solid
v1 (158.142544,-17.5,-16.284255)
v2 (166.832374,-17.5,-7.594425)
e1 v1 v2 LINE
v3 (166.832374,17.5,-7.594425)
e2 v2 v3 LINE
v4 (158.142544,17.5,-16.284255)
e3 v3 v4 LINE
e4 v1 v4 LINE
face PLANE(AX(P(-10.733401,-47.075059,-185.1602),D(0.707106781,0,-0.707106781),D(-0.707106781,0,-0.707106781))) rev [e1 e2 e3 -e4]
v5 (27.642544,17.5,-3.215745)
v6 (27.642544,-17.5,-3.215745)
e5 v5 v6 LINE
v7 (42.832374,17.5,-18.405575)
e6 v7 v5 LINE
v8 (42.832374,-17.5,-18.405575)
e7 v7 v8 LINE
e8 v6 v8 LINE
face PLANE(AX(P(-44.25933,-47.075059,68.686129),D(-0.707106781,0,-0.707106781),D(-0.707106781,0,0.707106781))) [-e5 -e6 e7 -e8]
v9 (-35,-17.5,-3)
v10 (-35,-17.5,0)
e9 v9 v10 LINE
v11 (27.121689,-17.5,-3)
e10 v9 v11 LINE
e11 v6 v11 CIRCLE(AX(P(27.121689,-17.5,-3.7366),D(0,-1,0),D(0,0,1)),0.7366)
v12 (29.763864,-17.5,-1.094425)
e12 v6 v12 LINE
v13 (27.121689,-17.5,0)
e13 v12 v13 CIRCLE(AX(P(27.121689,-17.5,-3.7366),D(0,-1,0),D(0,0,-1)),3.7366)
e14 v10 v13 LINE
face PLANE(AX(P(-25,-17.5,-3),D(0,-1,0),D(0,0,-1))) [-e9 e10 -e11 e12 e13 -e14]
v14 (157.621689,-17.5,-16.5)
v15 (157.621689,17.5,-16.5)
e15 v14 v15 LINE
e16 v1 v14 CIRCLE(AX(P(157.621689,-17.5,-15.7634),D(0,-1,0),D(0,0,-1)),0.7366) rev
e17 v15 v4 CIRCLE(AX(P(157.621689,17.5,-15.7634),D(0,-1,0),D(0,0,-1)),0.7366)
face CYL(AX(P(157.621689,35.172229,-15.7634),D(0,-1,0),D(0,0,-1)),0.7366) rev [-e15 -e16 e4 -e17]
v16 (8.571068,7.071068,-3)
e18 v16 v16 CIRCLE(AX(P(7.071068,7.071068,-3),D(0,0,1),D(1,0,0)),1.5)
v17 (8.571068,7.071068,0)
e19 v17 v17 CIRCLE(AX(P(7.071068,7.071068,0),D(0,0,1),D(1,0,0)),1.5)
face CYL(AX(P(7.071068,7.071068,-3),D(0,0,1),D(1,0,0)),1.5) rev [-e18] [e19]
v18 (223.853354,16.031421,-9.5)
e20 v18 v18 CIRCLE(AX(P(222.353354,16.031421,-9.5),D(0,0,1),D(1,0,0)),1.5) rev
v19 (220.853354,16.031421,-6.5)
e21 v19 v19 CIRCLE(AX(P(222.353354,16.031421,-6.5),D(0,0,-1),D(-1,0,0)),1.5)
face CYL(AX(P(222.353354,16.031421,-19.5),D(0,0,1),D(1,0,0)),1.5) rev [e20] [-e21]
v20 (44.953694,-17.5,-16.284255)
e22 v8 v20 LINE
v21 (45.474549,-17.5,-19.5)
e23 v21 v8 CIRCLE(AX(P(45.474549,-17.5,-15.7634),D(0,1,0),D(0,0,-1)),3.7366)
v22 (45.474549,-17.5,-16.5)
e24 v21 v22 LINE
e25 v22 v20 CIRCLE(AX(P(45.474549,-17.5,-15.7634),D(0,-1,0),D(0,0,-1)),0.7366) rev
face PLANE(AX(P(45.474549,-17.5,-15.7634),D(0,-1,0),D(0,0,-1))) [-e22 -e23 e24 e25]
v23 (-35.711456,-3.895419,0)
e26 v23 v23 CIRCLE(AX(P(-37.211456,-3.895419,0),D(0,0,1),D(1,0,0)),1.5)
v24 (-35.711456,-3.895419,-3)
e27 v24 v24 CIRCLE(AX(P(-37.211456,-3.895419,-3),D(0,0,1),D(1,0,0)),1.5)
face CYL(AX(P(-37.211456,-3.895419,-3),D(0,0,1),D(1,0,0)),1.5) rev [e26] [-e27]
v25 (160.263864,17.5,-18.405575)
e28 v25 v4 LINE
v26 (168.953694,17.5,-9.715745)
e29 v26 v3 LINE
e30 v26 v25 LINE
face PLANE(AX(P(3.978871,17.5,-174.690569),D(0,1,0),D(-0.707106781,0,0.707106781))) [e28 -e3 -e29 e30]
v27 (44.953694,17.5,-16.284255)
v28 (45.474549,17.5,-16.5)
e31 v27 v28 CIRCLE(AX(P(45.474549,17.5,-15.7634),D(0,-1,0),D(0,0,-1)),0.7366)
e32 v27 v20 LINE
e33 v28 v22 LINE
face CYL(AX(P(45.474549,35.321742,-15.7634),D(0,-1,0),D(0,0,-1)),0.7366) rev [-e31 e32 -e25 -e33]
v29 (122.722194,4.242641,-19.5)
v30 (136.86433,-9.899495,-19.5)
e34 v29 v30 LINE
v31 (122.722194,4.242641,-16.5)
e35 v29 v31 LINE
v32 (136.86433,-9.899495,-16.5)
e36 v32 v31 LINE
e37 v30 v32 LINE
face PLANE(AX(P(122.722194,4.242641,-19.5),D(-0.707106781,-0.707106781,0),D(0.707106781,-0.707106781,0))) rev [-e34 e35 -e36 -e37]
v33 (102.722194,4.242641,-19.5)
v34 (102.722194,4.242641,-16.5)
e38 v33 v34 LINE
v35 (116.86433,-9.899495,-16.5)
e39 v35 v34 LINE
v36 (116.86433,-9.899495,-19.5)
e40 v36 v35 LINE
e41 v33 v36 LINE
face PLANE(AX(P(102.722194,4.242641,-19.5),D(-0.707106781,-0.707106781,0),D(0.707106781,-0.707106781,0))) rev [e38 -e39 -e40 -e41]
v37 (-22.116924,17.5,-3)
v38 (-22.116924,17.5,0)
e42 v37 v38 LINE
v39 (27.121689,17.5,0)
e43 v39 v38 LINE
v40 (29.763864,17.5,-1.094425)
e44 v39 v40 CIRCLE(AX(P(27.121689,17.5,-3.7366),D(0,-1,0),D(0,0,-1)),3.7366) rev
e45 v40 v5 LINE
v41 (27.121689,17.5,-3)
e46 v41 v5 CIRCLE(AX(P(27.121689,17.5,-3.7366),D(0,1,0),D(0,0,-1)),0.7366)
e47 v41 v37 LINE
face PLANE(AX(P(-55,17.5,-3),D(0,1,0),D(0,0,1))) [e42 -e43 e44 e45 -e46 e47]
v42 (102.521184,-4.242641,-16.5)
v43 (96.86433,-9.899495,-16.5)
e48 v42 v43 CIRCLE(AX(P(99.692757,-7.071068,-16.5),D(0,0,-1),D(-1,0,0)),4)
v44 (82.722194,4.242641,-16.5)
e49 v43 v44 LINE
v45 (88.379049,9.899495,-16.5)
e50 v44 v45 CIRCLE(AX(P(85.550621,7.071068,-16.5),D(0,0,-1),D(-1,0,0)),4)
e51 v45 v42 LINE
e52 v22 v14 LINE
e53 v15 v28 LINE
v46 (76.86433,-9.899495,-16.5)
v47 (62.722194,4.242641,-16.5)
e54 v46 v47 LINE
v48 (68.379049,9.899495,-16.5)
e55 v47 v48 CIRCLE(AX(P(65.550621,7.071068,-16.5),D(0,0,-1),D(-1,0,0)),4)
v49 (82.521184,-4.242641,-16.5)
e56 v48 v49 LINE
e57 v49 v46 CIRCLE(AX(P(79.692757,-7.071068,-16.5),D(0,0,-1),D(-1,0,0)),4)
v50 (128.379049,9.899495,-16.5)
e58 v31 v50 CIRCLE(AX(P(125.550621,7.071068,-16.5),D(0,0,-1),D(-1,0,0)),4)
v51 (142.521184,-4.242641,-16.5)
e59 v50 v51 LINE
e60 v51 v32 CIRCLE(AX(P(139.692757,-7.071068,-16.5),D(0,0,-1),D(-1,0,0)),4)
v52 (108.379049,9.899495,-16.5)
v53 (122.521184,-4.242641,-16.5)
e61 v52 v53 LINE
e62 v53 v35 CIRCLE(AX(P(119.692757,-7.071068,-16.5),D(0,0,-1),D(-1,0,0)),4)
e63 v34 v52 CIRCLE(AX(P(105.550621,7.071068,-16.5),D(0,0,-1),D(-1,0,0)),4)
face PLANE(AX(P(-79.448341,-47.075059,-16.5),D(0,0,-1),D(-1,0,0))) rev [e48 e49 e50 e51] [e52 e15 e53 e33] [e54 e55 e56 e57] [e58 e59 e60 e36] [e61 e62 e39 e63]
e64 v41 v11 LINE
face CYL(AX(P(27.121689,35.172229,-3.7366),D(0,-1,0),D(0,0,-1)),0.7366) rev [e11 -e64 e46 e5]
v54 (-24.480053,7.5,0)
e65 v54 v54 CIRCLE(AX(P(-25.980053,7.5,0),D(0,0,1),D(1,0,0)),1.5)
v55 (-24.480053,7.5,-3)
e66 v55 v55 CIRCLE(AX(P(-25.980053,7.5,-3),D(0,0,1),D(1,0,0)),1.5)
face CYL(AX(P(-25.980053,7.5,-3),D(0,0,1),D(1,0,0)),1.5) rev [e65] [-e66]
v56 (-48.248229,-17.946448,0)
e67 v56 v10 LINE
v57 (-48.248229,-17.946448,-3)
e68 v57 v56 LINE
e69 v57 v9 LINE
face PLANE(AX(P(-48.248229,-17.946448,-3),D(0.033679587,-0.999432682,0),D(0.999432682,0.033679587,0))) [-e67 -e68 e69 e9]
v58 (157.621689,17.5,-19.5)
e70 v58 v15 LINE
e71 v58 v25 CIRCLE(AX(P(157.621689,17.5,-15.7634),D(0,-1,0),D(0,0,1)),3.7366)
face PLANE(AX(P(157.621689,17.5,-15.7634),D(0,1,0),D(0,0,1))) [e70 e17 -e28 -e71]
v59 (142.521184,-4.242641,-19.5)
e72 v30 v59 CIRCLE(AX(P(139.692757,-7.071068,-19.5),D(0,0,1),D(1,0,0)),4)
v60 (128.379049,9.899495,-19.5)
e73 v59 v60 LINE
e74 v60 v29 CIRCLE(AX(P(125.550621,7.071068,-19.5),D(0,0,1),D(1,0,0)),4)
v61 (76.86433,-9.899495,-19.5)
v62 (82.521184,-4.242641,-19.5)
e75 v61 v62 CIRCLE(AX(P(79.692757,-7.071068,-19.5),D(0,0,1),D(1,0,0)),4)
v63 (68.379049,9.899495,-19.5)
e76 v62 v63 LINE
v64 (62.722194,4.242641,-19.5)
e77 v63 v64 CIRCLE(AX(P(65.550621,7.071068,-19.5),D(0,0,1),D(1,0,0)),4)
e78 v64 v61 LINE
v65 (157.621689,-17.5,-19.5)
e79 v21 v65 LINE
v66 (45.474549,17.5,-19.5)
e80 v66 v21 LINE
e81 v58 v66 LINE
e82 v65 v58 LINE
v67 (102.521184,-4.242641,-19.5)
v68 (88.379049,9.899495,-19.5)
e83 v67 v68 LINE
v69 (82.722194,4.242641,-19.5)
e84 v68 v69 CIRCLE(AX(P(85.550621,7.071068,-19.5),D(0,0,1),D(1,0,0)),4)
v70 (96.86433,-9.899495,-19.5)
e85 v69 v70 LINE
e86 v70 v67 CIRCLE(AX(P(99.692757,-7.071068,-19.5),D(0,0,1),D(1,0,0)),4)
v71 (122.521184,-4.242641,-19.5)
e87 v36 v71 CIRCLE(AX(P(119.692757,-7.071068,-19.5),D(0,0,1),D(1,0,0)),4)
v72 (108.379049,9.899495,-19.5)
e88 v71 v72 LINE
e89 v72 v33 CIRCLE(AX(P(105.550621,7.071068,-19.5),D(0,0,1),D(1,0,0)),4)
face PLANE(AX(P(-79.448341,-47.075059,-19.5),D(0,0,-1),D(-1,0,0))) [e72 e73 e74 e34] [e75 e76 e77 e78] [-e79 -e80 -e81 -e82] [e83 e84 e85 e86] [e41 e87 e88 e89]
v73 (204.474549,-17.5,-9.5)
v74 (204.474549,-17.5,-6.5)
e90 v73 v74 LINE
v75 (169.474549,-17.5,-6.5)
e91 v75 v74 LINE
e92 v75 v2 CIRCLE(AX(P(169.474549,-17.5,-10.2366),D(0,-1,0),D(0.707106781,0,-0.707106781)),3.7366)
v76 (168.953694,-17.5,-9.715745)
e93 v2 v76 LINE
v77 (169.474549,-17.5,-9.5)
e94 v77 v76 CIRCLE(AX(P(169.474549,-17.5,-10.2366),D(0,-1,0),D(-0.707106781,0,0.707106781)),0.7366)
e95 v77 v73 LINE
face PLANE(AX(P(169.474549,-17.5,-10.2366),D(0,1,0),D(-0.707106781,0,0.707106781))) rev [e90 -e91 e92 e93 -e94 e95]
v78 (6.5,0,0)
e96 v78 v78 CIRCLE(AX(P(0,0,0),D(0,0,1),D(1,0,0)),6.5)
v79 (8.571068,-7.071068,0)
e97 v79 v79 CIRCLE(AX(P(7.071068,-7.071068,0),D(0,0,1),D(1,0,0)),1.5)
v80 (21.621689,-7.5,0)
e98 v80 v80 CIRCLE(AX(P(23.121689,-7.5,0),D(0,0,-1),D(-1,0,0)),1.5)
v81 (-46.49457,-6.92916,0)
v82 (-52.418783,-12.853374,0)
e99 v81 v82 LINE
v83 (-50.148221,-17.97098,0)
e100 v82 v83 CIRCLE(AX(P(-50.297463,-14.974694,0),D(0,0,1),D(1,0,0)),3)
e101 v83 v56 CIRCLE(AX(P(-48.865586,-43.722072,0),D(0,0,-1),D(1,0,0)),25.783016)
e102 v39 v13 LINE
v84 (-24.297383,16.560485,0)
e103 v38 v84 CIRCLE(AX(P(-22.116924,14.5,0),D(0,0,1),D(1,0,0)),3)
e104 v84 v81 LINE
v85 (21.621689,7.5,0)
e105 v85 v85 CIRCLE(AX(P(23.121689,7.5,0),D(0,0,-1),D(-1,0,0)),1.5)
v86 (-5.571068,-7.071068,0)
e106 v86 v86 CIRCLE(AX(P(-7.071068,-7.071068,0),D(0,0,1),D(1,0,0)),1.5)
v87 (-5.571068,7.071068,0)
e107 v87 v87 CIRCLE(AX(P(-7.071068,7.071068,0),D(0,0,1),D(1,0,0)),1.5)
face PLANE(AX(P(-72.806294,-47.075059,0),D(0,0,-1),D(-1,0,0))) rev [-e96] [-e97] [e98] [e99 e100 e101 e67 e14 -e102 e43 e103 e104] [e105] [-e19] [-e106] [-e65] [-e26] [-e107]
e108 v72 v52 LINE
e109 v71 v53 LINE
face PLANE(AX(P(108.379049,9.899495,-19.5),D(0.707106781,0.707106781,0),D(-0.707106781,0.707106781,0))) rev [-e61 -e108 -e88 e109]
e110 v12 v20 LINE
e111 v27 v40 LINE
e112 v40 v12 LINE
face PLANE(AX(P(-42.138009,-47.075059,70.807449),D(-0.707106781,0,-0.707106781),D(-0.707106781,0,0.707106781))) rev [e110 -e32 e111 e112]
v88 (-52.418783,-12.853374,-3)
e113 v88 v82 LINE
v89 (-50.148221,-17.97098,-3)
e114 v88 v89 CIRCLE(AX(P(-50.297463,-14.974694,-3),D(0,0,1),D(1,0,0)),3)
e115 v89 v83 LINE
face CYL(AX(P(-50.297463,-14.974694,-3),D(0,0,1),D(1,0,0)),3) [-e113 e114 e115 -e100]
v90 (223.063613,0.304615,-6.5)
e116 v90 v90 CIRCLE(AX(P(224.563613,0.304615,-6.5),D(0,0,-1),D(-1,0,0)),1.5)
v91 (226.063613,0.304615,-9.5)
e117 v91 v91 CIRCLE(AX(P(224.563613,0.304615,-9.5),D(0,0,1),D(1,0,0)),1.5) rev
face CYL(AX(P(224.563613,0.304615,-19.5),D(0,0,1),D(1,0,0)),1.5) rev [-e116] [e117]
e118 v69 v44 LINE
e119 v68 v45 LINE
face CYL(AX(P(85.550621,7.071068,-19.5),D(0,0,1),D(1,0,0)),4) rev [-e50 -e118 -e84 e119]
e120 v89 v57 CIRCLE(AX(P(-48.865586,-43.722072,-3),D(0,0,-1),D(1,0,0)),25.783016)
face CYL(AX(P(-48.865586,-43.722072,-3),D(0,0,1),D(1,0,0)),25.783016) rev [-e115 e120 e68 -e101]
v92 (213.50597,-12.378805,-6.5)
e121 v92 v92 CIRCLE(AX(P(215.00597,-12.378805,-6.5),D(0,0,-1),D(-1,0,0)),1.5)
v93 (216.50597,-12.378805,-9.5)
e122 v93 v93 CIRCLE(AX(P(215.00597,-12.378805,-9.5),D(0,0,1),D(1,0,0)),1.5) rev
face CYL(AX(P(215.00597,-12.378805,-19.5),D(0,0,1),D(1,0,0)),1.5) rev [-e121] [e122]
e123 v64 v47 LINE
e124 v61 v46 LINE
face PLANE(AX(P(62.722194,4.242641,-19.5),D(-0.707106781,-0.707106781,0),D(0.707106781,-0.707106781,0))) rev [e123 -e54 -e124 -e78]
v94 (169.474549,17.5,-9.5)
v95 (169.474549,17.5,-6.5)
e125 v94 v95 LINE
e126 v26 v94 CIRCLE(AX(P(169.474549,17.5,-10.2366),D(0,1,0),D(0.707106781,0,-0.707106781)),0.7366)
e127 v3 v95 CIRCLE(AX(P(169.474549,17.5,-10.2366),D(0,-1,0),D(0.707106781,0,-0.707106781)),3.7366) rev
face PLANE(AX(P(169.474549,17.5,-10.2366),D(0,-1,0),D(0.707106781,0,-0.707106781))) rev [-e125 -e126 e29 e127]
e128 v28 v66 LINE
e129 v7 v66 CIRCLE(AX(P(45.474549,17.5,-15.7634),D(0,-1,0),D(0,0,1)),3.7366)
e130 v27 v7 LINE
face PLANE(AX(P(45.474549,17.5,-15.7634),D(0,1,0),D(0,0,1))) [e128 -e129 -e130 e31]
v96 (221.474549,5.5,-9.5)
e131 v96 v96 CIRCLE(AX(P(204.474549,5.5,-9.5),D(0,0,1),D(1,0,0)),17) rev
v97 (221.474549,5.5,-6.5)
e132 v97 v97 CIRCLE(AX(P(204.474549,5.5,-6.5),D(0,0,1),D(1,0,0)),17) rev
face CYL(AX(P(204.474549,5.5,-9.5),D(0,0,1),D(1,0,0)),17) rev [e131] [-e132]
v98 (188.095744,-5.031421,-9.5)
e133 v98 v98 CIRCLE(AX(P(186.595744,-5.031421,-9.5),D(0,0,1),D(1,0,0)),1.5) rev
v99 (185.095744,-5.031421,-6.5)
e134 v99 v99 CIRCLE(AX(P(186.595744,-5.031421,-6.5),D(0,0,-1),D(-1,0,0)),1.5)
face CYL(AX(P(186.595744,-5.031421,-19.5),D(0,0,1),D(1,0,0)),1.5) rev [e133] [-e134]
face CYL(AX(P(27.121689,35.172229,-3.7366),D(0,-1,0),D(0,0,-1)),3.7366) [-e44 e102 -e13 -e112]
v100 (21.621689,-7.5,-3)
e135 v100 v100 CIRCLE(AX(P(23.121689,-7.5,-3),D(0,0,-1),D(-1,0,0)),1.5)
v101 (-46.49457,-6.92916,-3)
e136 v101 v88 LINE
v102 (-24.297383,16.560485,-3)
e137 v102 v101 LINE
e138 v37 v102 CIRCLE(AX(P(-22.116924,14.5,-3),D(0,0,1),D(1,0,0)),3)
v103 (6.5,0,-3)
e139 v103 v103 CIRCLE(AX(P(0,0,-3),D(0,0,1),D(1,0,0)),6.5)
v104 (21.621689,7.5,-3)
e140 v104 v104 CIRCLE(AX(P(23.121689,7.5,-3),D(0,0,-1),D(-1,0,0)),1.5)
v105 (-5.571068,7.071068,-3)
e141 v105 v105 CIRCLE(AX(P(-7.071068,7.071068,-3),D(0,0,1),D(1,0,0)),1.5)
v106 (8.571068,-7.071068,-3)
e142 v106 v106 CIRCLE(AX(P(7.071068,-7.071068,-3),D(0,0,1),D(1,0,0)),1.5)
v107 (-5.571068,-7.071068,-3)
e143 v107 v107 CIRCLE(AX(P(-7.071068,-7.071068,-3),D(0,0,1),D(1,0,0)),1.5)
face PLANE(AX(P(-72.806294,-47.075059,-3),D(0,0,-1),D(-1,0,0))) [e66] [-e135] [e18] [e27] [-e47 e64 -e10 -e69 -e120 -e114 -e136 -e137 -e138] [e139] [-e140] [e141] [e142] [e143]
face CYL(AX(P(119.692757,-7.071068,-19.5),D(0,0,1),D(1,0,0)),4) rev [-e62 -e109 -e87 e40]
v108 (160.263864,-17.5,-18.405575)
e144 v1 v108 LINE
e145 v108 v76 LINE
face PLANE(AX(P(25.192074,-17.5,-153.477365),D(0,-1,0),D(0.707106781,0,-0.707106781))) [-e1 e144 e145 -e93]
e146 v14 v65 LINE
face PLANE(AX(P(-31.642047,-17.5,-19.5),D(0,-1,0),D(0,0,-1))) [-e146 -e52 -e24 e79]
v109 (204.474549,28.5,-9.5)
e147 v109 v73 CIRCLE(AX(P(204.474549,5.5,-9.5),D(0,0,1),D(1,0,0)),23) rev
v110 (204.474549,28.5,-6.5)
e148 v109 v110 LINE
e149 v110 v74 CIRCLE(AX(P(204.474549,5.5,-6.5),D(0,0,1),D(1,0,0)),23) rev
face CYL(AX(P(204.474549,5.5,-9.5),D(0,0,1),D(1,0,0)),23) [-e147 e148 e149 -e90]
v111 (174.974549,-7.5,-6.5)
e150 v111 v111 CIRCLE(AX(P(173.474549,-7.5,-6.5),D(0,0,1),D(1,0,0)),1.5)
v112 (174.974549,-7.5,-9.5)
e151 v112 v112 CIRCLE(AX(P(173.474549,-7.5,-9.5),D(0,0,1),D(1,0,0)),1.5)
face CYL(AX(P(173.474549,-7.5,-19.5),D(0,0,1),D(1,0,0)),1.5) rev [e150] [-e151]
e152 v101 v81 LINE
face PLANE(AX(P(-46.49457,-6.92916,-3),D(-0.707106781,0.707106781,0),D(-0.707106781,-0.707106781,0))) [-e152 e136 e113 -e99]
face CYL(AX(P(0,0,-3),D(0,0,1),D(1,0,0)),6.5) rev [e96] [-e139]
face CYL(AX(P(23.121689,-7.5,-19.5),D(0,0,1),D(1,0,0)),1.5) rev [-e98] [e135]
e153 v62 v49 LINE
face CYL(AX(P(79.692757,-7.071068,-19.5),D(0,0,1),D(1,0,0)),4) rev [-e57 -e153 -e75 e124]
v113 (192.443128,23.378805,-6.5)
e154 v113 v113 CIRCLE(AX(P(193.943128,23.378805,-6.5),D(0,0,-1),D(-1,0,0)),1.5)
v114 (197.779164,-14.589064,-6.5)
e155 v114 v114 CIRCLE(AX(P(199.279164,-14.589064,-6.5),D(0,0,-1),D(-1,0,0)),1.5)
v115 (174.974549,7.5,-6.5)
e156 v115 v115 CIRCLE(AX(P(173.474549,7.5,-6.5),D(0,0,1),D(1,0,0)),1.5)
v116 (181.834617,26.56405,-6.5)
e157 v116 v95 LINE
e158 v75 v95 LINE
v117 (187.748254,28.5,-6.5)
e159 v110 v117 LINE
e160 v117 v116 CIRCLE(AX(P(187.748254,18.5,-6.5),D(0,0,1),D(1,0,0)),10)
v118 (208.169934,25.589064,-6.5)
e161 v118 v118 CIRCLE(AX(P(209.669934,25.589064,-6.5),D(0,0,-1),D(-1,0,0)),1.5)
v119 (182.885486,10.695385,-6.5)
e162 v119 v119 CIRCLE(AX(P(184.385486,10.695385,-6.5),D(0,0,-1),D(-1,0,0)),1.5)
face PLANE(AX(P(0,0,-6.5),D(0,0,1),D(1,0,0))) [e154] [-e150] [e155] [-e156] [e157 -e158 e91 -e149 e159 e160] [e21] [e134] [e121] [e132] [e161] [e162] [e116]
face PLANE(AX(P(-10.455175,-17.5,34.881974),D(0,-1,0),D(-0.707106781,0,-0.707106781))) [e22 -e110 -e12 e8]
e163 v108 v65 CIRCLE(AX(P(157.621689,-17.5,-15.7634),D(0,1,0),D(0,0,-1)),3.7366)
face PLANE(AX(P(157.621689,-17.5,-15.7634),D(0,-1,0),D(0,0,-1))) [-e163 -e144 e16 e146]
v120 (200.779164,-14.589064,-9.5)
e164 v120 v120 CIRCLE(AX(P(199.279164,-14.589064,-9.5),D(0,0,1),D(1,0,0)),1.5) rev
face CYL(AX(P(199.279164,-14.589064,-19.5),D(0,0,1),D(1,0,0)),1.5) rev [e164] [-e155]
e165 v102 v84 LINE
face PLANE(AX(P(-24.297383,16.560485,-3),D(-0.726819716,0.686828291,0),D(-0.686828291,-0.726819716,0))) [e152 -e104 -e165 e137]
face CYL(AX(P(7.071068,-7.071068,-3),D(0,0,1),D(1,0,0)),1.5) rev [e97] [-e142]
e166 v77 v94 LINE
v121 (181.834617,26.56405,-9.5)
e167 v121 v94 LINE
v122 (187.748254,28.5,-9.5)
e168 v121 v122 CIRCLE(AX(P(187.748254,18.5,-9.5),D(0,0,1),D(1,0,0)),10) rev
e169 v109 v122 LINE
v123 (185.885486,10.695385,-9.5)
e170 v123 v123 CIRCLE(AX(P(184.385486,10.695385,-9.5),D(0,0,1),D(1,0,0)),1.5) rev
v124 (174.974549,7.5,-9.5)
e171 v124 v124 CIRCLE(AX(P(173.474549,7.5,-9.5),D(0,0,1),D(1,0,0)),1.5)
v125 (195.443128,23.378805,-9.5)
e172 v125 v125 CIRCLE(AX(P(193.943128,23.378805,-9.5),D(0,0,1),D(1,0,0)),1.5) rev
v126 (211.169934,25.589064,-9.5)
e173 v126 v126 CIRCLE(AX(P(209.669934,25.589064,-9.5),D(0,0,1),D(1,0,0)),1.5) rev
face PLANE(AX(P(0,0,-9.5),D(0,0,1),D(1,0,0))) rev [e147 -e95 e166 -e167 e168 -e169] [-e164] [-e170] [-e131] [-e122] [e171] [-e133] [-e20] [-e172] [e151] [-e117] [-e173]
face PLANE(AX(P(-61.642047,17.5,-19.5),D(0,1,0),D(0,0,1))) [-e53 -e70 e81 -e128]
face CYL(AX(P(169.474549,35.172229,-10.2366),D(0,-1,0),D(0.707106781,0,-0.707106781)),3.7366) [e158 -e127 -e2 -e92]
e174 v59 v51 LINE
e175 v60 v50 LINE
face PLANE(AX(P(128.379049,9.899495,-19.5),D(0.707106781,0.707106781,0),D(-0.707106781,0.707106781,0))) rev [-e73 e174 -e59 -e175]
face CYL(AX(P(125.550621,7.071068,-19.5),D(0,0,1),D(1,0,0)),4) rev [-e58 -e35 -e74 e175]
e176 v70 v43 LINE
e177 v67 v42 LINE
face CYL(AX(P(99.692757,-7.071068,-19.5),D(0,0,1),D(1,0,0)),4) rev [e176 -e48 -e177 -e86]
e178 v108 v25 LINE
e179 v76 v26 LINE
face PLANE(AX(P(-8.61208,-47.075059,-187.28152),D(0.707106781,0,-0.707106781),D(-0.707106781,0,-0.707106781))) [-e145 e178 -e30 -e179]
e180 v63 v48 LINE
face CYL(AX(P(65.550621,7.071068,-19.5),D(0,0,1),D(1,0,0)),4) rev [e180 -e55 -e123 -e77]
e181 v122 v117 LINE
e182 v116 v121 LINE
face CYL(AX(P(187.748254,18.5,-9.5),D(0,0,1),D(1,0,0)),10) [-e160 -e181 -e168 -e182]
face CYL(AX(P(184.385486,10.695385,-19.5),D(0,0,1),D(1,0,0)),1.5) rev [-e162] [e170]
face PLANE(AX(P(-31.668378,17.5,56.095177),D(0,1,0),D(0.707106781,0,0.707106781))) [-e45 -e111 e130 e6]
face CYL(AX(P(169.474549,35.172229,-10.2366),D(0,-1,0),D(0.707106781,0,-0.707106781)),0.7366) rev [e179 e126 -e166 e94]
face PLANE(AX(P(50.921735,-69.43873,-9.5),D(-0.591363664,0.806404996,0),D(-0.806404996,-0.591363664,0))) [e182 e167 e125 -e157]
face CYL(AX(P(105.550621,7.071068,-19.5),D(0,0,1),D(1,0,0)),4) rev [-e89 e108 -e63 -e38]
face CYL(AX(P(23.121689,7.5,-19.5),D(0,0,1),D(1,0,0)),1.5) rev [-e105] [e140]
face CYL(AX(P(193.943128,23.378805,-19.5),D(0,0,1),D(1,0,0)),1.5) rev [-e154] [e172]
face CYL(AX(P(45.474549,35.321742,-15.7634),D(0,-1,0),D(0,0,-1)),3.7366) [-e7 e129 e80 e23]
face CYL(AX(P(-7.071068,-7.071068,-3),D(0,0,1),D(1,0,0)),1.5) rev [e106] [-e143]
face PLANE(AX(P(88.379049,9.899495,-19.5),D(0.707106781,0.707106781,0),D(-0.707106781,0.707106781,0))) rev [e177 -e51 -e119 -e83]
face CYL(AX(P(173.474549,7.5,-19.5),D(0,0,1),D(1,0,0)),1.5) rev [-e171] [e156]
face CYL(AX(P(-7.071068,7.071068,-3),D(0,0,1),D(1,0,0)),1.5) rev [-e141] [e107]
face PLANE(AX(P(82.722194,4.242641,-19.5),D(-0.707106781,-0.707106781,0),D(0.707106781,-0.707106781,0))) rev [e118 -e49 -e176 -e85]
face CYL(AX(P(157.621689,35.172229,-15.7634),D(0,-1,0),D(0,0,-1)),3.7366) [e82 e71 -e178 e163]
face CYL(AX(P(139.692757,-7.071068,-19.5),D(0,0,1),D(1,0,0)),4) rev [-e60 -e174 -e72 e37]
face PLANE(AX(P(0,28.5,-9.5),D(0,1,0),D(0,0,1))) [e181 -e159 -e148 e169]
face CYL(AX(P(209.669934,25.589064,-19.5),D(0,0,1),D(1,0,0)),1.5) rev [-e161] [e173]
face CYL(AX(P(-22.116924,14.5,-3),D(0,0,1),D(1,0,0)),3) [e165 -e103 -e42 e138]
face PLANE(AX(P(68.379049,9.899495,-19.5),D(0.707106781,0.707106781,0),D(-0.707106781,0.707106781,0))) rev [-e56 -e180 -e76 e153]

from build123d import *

# Parameters (mm, degrees)
SKETCH_1_R               = 6.5
SKETCH_1_R_2             = 1.5
SM_BASE_FLANGE_1_DEPTH   = 3
OTHER_START              = -17.5
OTHER_1_DEPTH            = 35
OTHER_1_2_DEPTH          = 35
FILLET_1_R               = 5
EXTRUDE_START            = -3
EXTRUDE_1_OUTLINE_W      = 142
EXTRUDE_1_OUTLINE_H      = 35
EXTRUDE_1_DEPTH          = 3
OTHER_2_DEPTH            = 35
OTHER_2_2_DEPTH          = 35
SKETCH_9_W               = 40.525450659
SKETCH_9_H               = 35
CUT_EXTRUDE_1_DEPTH      = 212.62821173
EXTRUDE_START_2          = -6.5
SKETCH_10_R              = 23
SKETCH_10_R_2            = 20.75
SKETCH_10_R_3            = 17
EXTRUDE_2_DEPTH          = 3
FILLET_2_R               = 10
SKETCH_15_R              = 1.5
CUT_EXTRUDE_2_DEPTH      = 230.621254674
CUT_EXTRUDE_4_DEPTH      = 3
CUT_EXTRUDE_6_DEPTH      = 231.080791458
CUT_EXTRUDE_6_DEPTH_BACK = 231.080791458
SKETCH_21_R              = 1.5
CUT_EXTRUDE_7_DEPTH      = 230.845971463
CUT_EXTRUDE_7_DEPTH_BACK = 230.845971463
SKETCH_24_R              = 1.5
SKETCH_24_R_2            = 6.5
EXTRUDE_3_DEPTH          = 3


# Read off the part's stored shape, not the designer's step: 转折1, 凸台-拉伸1, 转折2
# Sheet-metal steps are written as plain solids
with BuildPart() as part:
    # Sketch 1 → 基体-法兰1 (new body)
    with BuildSketch(Plane.XY):
        with BuildLine():
            Line((-55, -2.5), (-55, 17.5))
            Line((-55, 17.5), (-25, 17.5))
            Line((-25, 17.5), (25, 17.5))
            Line((25, 17.5), (68, 17.5))
            Line((68, 17.5), (68, -17.5))
            Line((68, -17.5), (25, -17.5))
            Line((25, -17.5), (-25, -17.5))
            Line((-25, -17.5), (-35, -17.5))
            ThreePointArc((-35, -17.5), (-44.006294251, -8.675059002), (-55, -2.5))
        make_face()
        Circle(SKETCH_1_R, mode=Mode.SUBTRACT)
        with Locations((7.071067812, 7.071067812)):
            Circle(SKETCH_1_R_2, mode=Mode.SUBTRACT)
        with Locations((7.071067812, -7.071067812)):
            Circle(SKETCH_1_R_2, mode=Mode.SUBTRACT)
        with Locations((-7.071067812, -7.071067812)):
            Circle(SKETCH_1_R_2, mode=Mode.SUBTRACT)
        with Locations((-7.071067812, 7.071067812)):
            Circle(SKETCH_1_R_2, mode=Mode.SUBTRACT)
    extrude(amount=-SM_BASE_FLANGE_1_DEPTH)

    # Other 1 outline → Other 1 (cut)
    with BuildSketch(Plane(origin=(0, 0, 0), x_dir=(1, 0, 0), z_dir=(0, 1, 0)).offset(OTHER_START)):
        with BuildLine():
            Line((68, 3), (31.669439631, 3))
            Line((31.669439631, 3), (29.763864432, 1.094424801))
            ThreePointArc((29.763864432, 1.094424801), (28.551624147, 0.284431739), (27.121689234, 0))
            Line((27.121689234, 0), (68, 0))
            Line((68, 0), (68, 3))
        make_face()
    extrude(amount=OTHER_1_DEPTH, mode=Mode.SUBTRACT)

    # Other 1 2 outline → Other 1 2 (add)
    with BuildSketch(Plane(origin=(0, 0, 0), x_dir=(1, 0, 0), z_dir=(0, 1, 0)).offset(OTHER_START)):
        with BuildLine():
            ThreePointArc((45.474549341, 19.5), (44.044614428, 19.215568261), (42.832374142, 18.405575199))
            Line((42.832374142, 18.405575199), (27.642544089, 3.215745145))
            ThreePointArc((27.642544089, 3.215745145), (27.40357385, 3.056070336), (27.121689234, 3))
            Line((27.121689234, 3), (31.669439631, 3))
            Line((31.669439631, 3), (44.953694486, 16.284254855))
            ThreePointArc((44.953694486, 16.284254855), (45.192664725, 16.443929664), (45.474549341, 16.5))
            Line((45.474549341, 16.5), (68, 16.5))
            Line((68, 16.5), (68, 19.5))
            Line((68, 19.5), (45.474549341, 19.5))
        make_face()
    extrude(amount=OTHER_1_2_DEPTH)

    # 圆角1
    fillet_1_edges = [part.edges().sort_by_distance(p)[0] for p in [
        (-55, -2.5, -1.5),
        (-35, -17.5, -1.5),
        (-55, 17.5, -1.5),
    ]]
    fillet(fillet_1_edges, radius=FILLET_1_R)

    # 凸台-拉伸1 outline → 凸台-拉伸1 (add)
    with BuildSketch(Plane.XY.offset(-16.5).offset(EXTRUDE_START)):
        with Locations((139, 0)):
            Rectangle(EXTRUDE_1_OUTLINE_W, EXTRUDE_1_OUTLINE_H)
    extrude(amount=EXTRUDE_1_DEPTH)

    # Other 2 outline → Other 2 (cut)
    with BuildSketch(Plane(origin=(0, 0, 0), x_dir=(1, 0, 0), z_dir=(0, 1, 0)).offset(OTHER_START)):
        with BuildLine():
            Line((210, 19.5), (157.621689234, 19.5))
            ThreePointArc((157.621689234, 19.5), (159.051624147, 19.215568261), (160.263864432, 18.405575199))
            Line((160.263864432, 18.405575199), (162.169439631, 16.5))
            Line((162.169439631, 16.5), (210, 16.5))
            Line((210, 16.5), (210, 19.5))
        make_face()
    extrude(amount=OTHER_2_DEPTH, mode=Mode.SUBTRACT)

    # Other 2 2 outline → Other 2 2 (add)
    with BuildSketch(Plane(origin=(0, 0, 0), x_dir=(1, 0, 0), z_dir=(0, 1, 0)).offset(OTHER_START)):
        with BuildLine():
            Line((168.953694486, 9.715745145), (162.169439631, 16.5))
            Line((162.169439631, 16.5), (157.621689234, 16.5))
            ThreePointArc((157.621689234, 16.5), (157.90357385, 16.443929664), (158.142544089, 16.284254855))
            Line((158.142544089, 16.284254855), (166.832374142, 7.594424801))
            ThreePointArc((166.832374142, 7.594424801), (168.044614428, 6.784431739), (169.474549341, 6.5))
            Line((169.474549341, 6.5), (210, 6.5))
            Line((210, 6.5), (210, 9.5))
            Line((210, 9.5), (169.474549341, 9.5))
            ThreePointArc((169.474549341, 9.5), (169.192664725, 9.556070336), (168.953694486, 9.715745145))
        make_face()
    extrude(amount=OTHER_2_2_DEPTH)

    # 草图9 → 切除-拉伸1 (cut, through all)
    with BuildSketch(Plane.XY):
        with Locations((189.73727467, 0)):
            Rectangle(SKETCH_9_W, SKETCH_9_H)
    extrude(amount=-CUT_EXTRUDE_1_DEPTH, mode=Mode.SUBTRACT)

    # 草图10 → 凸台-拉伸2 (add)
    # profile 1 of 4: a face of its own
    with BuildSketch(Plane.XY.offset(EXTRUDE_START_2)):
        with BuildLine():
            ThreePointArc((157.474549341, 5.5), (118.211093374, 21.763455967), (134.474549341, -17.5))
            ThreePointArc((134.474549341, -17.5), (150.738005308, -10.763455967), (157.474549341, 5.5))
        make_face()
    # profile 2 of 4: a face of its own
    with BuildSketch(Plane.XY.offset(EXTRUDE_START_2)):
        with BuildLine():
            Line((169.474549341, 17.5), (169.474549341, -17.5))
            Line((169.474549341, -17.5), (204.474549341, -17.5))
            ThreePointArc((204.474549341, -17.5), (181.474549341, 5.5), (204.474549341, 28.5))
            Line((204.474549341, 28.5), (184.474549341, 28.5))
            Line((184.474549341, 28.5), (169.474549341, 17.5))
        make_face()
    # profile 3 of 4: a face of its own
    with BuildSketch(Plane.XY.offset(EXTRUDE_START_2)):
        with Locations((204.474549341, 5.5)):
            Circle(SKETCH_10_R)
        with Locations((204.474549341, 5.5)):
            Circle(SKETCH_10_R_2, mode=Mode.SUBTRACT)
    # profile 4 of 4: a face of its own
    with BuildSketch(Plane.XY.offset(EXTRUDE_START_2)):
        with Locations((204.474549341, 5.5)):
            Circle(SKETCH_10_R_2)
        with Locations((204.474549341, 5.5)):
            Circle(SKETCH_10_R_3, mode=Mode.SUBTRACT)
    extrude(amount=-EXTRUDE_2_DEPTH)


with BuildPart() as extrude_2_kept_piece:
    # of the separate pieces the step leaves, the one the design keeps (extrude_2_pieces_kept)
    add(part.part.solids().sort_by_distance((-36.426633909, -15.761798019, 0))[0])

    # 圆角2
    fillet_2_edges = [extrude_2_kept_piece.edges().sort_by_distance(p)[0] for p in [
        (184.474549341, 28.5, -8),
    ]]
    fillet(fillet_2_edges, radius=FILLET_2_R)

    # 草图15 → 切除-拉伸2 (cut, through all)
    with BuildSketch(Plane(origin=(0, 0, -6.5), x_dir=(-1, 0, 0), z_dir=(0, 0, -1))):
        with Locations(Location((-209.669934425, 25.589063538, 0), (0, 0, 180))):
            Circle(SKETCH_15_R)
        with Locations(Location((-193.94312831, 23.378805079, 0), (0, 0, 180))):
            Circle(SKETCH_15_R)
        with Locations(Location((-184.385485803, 10.695385084, 0), (0, 0, 180))):
            Circle(SKETCH_15_R)
        with Locations(Location((-186.595744262, -5.031421031, 0), (0, 0, 180))):
            Circle(SKETCH_15_R)
        with Locations(Location((-199.279164257, -14.589063538, 0), (0, 0, 180))):
            Circle(SKETCH_15_R)
        with Locations(Location((-215.005970373, -12.378805079, 0), (0, 0, 180))):
            Circle(SKETCH_15_R)
        with Locations(Location((-224.563612879, 0.304614916, 0), (0, 0, 180))):
            Circle(SKETCH_15_R)
        with Locations(Location((-222.35335442, 16.031421031, 0), (0, 0, 180))):
            Circle(SKETCH_15_R)
    extrude(amount=CUT_EXTRUDE_2_DEPTH, mode=Mode.SUBTRACT)

    # 草图18 → 切除-拉伸4 (cut)
    with BuildSketch(Plane.XY):
        with BuildLine():
            Line((-32.637085957, -17.5), (-16.817614436, -17.5))
            Line((-16.817614436, -17.5), (-16.817614436, 17.5))
            Line((-16.817614436, 17.5), (-50, 17.5))
            ThreePointArc((-50, 17.5), (-53.535533906, 16.035533906), (-55, 12.5))
            Line((-55, 12.5), (-55, 0.76710799))
            ThreePointArc((-55, 0.76710799), (-54.228338088, -1.901441619), (-52.151537194, -3.74630399))
            ThreePointArc((-52.151537194, -3.74630399), (-43.663126678, -8.93484684), (-36.426633909, -15.761798019))
            ThreePointArc((-36.426633909, -15.761798019), (-34.721673435, -17.044721669), (-32.637085957, -17.5))
        make_face()
    extrude(amount=-CUT_EXTRUDE_4_DEPTH, mode=Mode.SUBTRACT)

    # 草图21 → 切除-拉伸6 (cut, two sides: drawn at the far end of the back side and taken through both)
    with BuildSketch(Plane.XY.offset(-CUT_EXTRUDE_6_DEPTH_BACK)):
        with Locations((173.474549341, 7.5)):
            Circle(SKETCH_21_R)
        with Locations((173.474549341, -7.5)):
            Circle(SKETCH_21_R)
        with Locations(Location((23.121689234, 7.5, 0), (0, 0, 180))):
            Circle(SKETCH_21_R)
        with Locations(Location((23.121689234, -7.5, 0), (0, 0, 180))):
            Circle(SKETCH_21_R)
    extrude(amount=CUT_EXTRUDE_6_DEPTH + CUT_EXTRUDE_6_DEPTH_BACK, mode=Mode.SUBTRACT)

    # 草图22 → 切除-拉伸7 (cut, two sides: drawn at the far end of the back side and taken through both)
    with BuildSketch(Plane.XY.offset(-16.5).offset(-CUT_EXTRUDE_7_DEPTH_BACK)):
        with BuildLine():
            Line((128.379048547, 9.899494937), (142.52118417, -4.242640687))
            ThreePointArc((142.52118417, -4.242640687), (142.52118417, -9.899494937), (136.864329921, -9.899494937))
            Line((136.864329921, -9.899494937), (122.722194297, 4.242640687))
            ThreePointArc((122.722194297, 4.242640687), (122.722194297, 9.899494937), (128.379048547, 9.899494937))
        make_face()
        with BuildLine():
            Line((108.379048547, 9.899494937), (122.52118417, -4.242640687))
            ThreePointArc((122.52118417, -4.242640687), (122.52118417, -9.899494937), (116.864329921, -9.899494937))
            Line((116.864329921, -9.899494937), (102.722194297, 4.242640687))
            ThreePointArc((102.722194297, 4.242640687), (102.722194297, 9.899494937), (108.379048547, 9.899494937))
        make_face()
        with BuildLine():
            Line((88.379048547, 9.899494937), (102.52118417, -4.242640687))
            ThreePointArc((102.52118417, -4.242640687), (102.52118417, -9.899494937), (96.864329921, -9.899494937))
            Line((96.864329921, -9.899494937), (82.722194297, 4.242640687))
            ThreePointArc((82.722194297, 4.242640687), (82.722194297, 9.899494937), (88.379048547, 9.899494937))
        make_face()
        with BuildLine():
            Line((68.379048547, 9.899494937), (82.52118417, -4.242640687))
            ThreePointArc((82.52118417, -4.242640687), (82.52118417, -9.899494937), (76.864329921, -9.899494937))
            Line((76.864329921, -9.899494937), (62.722194297, 4.242640687))
            ThreePointArc((62.722194297, 4.242640687), (62.722194297, 9.899494937), (68.379048547, 9.899494937))
        make_face()
    extrude(amount=CUT_EXTRUDE_7_DEPTH + CUT_EXTRUDE_7_DEPTH_BACK, mode=Mode.SUBTRACT)

    # 草图24 → 凸台-拉伸3 (add)
    with BuildSketch(Plane.XY):
        with BuildLine():
            Line((-46.494570055, -6.929160459), (-52.418783312, -12.853373716))
            ThreePointArc((-52.418783312, -12.853373716), (-53.03967847, -16.191351014), (-50.14822115, -17.970979573))
            ThreePointArc((-50.14822115, -17.970979573), (-49.198451339, -17.941204792), (-48.248229397, -17.946448179))
            Line((-48.248229397, -17.946448179), (-35, -17.5))
            Line((-35, -17.5), (27.121689234, -17.5))
            Line((27.121689234, -17.5), (27.121689234, 17.5))
            Line((27.121689234, 17.5), (-22.11692418, 17.5))
            ThreePointArc((-22.11692418, 17.5), (-23.304052097, 17.255127458), (-24.297383327, 16.560484872))
            Line((-24.297383327, 16.560484872), (-46.494570055, -6.929160459))
        make_face()
        with Locations((-7.071067812, 7.071067812)):
            Circle(SKETCH_24_R, mode=Mode.SUBTRACT)
        with Locations((-7.071067812, -7.071067812)):
            Circle(SKETCH_24_R, mode=Mode.SUBTRACT)
        with Locations((7.071067812, -7.071067812)):
            Circle(SKETCH_24_R, mode=Mode.SUBTRACT)
        with Locations((7.071067812, 7.071067812)):
            Circle(SKETCH_24_R, mode=Mode.SUBTRACT)
        Circle(SKETCH_24_R_2, mode=Mode.SUBTRACT)
        with Locations((-37.211455917, -3.895419416)):
            Circle(SKETCH_24_R, mode=Mode.SUBTRACT)
        with Locations((-25.980052784, 7.5)):
            Circle(SKETCH_24_R, mode=Mode.SUBTRACT)
        with Locations(Location((23.121689234, 7.5, 0), (0, 0, 180.000000002))):
            Circle(SKETCH_24_R, mode=Mode.SUBTRACT)
        with Locations(Location((23.121689234, -7.5, 0), (0, 0, 180.000000002))):
            Circle(SKETCH_24_R, mode=Mode.SUBTRACT)
    extrude(amount=-EXTRUDE_3_DEPTH)


solid = extrude_2_kept_piece.part
